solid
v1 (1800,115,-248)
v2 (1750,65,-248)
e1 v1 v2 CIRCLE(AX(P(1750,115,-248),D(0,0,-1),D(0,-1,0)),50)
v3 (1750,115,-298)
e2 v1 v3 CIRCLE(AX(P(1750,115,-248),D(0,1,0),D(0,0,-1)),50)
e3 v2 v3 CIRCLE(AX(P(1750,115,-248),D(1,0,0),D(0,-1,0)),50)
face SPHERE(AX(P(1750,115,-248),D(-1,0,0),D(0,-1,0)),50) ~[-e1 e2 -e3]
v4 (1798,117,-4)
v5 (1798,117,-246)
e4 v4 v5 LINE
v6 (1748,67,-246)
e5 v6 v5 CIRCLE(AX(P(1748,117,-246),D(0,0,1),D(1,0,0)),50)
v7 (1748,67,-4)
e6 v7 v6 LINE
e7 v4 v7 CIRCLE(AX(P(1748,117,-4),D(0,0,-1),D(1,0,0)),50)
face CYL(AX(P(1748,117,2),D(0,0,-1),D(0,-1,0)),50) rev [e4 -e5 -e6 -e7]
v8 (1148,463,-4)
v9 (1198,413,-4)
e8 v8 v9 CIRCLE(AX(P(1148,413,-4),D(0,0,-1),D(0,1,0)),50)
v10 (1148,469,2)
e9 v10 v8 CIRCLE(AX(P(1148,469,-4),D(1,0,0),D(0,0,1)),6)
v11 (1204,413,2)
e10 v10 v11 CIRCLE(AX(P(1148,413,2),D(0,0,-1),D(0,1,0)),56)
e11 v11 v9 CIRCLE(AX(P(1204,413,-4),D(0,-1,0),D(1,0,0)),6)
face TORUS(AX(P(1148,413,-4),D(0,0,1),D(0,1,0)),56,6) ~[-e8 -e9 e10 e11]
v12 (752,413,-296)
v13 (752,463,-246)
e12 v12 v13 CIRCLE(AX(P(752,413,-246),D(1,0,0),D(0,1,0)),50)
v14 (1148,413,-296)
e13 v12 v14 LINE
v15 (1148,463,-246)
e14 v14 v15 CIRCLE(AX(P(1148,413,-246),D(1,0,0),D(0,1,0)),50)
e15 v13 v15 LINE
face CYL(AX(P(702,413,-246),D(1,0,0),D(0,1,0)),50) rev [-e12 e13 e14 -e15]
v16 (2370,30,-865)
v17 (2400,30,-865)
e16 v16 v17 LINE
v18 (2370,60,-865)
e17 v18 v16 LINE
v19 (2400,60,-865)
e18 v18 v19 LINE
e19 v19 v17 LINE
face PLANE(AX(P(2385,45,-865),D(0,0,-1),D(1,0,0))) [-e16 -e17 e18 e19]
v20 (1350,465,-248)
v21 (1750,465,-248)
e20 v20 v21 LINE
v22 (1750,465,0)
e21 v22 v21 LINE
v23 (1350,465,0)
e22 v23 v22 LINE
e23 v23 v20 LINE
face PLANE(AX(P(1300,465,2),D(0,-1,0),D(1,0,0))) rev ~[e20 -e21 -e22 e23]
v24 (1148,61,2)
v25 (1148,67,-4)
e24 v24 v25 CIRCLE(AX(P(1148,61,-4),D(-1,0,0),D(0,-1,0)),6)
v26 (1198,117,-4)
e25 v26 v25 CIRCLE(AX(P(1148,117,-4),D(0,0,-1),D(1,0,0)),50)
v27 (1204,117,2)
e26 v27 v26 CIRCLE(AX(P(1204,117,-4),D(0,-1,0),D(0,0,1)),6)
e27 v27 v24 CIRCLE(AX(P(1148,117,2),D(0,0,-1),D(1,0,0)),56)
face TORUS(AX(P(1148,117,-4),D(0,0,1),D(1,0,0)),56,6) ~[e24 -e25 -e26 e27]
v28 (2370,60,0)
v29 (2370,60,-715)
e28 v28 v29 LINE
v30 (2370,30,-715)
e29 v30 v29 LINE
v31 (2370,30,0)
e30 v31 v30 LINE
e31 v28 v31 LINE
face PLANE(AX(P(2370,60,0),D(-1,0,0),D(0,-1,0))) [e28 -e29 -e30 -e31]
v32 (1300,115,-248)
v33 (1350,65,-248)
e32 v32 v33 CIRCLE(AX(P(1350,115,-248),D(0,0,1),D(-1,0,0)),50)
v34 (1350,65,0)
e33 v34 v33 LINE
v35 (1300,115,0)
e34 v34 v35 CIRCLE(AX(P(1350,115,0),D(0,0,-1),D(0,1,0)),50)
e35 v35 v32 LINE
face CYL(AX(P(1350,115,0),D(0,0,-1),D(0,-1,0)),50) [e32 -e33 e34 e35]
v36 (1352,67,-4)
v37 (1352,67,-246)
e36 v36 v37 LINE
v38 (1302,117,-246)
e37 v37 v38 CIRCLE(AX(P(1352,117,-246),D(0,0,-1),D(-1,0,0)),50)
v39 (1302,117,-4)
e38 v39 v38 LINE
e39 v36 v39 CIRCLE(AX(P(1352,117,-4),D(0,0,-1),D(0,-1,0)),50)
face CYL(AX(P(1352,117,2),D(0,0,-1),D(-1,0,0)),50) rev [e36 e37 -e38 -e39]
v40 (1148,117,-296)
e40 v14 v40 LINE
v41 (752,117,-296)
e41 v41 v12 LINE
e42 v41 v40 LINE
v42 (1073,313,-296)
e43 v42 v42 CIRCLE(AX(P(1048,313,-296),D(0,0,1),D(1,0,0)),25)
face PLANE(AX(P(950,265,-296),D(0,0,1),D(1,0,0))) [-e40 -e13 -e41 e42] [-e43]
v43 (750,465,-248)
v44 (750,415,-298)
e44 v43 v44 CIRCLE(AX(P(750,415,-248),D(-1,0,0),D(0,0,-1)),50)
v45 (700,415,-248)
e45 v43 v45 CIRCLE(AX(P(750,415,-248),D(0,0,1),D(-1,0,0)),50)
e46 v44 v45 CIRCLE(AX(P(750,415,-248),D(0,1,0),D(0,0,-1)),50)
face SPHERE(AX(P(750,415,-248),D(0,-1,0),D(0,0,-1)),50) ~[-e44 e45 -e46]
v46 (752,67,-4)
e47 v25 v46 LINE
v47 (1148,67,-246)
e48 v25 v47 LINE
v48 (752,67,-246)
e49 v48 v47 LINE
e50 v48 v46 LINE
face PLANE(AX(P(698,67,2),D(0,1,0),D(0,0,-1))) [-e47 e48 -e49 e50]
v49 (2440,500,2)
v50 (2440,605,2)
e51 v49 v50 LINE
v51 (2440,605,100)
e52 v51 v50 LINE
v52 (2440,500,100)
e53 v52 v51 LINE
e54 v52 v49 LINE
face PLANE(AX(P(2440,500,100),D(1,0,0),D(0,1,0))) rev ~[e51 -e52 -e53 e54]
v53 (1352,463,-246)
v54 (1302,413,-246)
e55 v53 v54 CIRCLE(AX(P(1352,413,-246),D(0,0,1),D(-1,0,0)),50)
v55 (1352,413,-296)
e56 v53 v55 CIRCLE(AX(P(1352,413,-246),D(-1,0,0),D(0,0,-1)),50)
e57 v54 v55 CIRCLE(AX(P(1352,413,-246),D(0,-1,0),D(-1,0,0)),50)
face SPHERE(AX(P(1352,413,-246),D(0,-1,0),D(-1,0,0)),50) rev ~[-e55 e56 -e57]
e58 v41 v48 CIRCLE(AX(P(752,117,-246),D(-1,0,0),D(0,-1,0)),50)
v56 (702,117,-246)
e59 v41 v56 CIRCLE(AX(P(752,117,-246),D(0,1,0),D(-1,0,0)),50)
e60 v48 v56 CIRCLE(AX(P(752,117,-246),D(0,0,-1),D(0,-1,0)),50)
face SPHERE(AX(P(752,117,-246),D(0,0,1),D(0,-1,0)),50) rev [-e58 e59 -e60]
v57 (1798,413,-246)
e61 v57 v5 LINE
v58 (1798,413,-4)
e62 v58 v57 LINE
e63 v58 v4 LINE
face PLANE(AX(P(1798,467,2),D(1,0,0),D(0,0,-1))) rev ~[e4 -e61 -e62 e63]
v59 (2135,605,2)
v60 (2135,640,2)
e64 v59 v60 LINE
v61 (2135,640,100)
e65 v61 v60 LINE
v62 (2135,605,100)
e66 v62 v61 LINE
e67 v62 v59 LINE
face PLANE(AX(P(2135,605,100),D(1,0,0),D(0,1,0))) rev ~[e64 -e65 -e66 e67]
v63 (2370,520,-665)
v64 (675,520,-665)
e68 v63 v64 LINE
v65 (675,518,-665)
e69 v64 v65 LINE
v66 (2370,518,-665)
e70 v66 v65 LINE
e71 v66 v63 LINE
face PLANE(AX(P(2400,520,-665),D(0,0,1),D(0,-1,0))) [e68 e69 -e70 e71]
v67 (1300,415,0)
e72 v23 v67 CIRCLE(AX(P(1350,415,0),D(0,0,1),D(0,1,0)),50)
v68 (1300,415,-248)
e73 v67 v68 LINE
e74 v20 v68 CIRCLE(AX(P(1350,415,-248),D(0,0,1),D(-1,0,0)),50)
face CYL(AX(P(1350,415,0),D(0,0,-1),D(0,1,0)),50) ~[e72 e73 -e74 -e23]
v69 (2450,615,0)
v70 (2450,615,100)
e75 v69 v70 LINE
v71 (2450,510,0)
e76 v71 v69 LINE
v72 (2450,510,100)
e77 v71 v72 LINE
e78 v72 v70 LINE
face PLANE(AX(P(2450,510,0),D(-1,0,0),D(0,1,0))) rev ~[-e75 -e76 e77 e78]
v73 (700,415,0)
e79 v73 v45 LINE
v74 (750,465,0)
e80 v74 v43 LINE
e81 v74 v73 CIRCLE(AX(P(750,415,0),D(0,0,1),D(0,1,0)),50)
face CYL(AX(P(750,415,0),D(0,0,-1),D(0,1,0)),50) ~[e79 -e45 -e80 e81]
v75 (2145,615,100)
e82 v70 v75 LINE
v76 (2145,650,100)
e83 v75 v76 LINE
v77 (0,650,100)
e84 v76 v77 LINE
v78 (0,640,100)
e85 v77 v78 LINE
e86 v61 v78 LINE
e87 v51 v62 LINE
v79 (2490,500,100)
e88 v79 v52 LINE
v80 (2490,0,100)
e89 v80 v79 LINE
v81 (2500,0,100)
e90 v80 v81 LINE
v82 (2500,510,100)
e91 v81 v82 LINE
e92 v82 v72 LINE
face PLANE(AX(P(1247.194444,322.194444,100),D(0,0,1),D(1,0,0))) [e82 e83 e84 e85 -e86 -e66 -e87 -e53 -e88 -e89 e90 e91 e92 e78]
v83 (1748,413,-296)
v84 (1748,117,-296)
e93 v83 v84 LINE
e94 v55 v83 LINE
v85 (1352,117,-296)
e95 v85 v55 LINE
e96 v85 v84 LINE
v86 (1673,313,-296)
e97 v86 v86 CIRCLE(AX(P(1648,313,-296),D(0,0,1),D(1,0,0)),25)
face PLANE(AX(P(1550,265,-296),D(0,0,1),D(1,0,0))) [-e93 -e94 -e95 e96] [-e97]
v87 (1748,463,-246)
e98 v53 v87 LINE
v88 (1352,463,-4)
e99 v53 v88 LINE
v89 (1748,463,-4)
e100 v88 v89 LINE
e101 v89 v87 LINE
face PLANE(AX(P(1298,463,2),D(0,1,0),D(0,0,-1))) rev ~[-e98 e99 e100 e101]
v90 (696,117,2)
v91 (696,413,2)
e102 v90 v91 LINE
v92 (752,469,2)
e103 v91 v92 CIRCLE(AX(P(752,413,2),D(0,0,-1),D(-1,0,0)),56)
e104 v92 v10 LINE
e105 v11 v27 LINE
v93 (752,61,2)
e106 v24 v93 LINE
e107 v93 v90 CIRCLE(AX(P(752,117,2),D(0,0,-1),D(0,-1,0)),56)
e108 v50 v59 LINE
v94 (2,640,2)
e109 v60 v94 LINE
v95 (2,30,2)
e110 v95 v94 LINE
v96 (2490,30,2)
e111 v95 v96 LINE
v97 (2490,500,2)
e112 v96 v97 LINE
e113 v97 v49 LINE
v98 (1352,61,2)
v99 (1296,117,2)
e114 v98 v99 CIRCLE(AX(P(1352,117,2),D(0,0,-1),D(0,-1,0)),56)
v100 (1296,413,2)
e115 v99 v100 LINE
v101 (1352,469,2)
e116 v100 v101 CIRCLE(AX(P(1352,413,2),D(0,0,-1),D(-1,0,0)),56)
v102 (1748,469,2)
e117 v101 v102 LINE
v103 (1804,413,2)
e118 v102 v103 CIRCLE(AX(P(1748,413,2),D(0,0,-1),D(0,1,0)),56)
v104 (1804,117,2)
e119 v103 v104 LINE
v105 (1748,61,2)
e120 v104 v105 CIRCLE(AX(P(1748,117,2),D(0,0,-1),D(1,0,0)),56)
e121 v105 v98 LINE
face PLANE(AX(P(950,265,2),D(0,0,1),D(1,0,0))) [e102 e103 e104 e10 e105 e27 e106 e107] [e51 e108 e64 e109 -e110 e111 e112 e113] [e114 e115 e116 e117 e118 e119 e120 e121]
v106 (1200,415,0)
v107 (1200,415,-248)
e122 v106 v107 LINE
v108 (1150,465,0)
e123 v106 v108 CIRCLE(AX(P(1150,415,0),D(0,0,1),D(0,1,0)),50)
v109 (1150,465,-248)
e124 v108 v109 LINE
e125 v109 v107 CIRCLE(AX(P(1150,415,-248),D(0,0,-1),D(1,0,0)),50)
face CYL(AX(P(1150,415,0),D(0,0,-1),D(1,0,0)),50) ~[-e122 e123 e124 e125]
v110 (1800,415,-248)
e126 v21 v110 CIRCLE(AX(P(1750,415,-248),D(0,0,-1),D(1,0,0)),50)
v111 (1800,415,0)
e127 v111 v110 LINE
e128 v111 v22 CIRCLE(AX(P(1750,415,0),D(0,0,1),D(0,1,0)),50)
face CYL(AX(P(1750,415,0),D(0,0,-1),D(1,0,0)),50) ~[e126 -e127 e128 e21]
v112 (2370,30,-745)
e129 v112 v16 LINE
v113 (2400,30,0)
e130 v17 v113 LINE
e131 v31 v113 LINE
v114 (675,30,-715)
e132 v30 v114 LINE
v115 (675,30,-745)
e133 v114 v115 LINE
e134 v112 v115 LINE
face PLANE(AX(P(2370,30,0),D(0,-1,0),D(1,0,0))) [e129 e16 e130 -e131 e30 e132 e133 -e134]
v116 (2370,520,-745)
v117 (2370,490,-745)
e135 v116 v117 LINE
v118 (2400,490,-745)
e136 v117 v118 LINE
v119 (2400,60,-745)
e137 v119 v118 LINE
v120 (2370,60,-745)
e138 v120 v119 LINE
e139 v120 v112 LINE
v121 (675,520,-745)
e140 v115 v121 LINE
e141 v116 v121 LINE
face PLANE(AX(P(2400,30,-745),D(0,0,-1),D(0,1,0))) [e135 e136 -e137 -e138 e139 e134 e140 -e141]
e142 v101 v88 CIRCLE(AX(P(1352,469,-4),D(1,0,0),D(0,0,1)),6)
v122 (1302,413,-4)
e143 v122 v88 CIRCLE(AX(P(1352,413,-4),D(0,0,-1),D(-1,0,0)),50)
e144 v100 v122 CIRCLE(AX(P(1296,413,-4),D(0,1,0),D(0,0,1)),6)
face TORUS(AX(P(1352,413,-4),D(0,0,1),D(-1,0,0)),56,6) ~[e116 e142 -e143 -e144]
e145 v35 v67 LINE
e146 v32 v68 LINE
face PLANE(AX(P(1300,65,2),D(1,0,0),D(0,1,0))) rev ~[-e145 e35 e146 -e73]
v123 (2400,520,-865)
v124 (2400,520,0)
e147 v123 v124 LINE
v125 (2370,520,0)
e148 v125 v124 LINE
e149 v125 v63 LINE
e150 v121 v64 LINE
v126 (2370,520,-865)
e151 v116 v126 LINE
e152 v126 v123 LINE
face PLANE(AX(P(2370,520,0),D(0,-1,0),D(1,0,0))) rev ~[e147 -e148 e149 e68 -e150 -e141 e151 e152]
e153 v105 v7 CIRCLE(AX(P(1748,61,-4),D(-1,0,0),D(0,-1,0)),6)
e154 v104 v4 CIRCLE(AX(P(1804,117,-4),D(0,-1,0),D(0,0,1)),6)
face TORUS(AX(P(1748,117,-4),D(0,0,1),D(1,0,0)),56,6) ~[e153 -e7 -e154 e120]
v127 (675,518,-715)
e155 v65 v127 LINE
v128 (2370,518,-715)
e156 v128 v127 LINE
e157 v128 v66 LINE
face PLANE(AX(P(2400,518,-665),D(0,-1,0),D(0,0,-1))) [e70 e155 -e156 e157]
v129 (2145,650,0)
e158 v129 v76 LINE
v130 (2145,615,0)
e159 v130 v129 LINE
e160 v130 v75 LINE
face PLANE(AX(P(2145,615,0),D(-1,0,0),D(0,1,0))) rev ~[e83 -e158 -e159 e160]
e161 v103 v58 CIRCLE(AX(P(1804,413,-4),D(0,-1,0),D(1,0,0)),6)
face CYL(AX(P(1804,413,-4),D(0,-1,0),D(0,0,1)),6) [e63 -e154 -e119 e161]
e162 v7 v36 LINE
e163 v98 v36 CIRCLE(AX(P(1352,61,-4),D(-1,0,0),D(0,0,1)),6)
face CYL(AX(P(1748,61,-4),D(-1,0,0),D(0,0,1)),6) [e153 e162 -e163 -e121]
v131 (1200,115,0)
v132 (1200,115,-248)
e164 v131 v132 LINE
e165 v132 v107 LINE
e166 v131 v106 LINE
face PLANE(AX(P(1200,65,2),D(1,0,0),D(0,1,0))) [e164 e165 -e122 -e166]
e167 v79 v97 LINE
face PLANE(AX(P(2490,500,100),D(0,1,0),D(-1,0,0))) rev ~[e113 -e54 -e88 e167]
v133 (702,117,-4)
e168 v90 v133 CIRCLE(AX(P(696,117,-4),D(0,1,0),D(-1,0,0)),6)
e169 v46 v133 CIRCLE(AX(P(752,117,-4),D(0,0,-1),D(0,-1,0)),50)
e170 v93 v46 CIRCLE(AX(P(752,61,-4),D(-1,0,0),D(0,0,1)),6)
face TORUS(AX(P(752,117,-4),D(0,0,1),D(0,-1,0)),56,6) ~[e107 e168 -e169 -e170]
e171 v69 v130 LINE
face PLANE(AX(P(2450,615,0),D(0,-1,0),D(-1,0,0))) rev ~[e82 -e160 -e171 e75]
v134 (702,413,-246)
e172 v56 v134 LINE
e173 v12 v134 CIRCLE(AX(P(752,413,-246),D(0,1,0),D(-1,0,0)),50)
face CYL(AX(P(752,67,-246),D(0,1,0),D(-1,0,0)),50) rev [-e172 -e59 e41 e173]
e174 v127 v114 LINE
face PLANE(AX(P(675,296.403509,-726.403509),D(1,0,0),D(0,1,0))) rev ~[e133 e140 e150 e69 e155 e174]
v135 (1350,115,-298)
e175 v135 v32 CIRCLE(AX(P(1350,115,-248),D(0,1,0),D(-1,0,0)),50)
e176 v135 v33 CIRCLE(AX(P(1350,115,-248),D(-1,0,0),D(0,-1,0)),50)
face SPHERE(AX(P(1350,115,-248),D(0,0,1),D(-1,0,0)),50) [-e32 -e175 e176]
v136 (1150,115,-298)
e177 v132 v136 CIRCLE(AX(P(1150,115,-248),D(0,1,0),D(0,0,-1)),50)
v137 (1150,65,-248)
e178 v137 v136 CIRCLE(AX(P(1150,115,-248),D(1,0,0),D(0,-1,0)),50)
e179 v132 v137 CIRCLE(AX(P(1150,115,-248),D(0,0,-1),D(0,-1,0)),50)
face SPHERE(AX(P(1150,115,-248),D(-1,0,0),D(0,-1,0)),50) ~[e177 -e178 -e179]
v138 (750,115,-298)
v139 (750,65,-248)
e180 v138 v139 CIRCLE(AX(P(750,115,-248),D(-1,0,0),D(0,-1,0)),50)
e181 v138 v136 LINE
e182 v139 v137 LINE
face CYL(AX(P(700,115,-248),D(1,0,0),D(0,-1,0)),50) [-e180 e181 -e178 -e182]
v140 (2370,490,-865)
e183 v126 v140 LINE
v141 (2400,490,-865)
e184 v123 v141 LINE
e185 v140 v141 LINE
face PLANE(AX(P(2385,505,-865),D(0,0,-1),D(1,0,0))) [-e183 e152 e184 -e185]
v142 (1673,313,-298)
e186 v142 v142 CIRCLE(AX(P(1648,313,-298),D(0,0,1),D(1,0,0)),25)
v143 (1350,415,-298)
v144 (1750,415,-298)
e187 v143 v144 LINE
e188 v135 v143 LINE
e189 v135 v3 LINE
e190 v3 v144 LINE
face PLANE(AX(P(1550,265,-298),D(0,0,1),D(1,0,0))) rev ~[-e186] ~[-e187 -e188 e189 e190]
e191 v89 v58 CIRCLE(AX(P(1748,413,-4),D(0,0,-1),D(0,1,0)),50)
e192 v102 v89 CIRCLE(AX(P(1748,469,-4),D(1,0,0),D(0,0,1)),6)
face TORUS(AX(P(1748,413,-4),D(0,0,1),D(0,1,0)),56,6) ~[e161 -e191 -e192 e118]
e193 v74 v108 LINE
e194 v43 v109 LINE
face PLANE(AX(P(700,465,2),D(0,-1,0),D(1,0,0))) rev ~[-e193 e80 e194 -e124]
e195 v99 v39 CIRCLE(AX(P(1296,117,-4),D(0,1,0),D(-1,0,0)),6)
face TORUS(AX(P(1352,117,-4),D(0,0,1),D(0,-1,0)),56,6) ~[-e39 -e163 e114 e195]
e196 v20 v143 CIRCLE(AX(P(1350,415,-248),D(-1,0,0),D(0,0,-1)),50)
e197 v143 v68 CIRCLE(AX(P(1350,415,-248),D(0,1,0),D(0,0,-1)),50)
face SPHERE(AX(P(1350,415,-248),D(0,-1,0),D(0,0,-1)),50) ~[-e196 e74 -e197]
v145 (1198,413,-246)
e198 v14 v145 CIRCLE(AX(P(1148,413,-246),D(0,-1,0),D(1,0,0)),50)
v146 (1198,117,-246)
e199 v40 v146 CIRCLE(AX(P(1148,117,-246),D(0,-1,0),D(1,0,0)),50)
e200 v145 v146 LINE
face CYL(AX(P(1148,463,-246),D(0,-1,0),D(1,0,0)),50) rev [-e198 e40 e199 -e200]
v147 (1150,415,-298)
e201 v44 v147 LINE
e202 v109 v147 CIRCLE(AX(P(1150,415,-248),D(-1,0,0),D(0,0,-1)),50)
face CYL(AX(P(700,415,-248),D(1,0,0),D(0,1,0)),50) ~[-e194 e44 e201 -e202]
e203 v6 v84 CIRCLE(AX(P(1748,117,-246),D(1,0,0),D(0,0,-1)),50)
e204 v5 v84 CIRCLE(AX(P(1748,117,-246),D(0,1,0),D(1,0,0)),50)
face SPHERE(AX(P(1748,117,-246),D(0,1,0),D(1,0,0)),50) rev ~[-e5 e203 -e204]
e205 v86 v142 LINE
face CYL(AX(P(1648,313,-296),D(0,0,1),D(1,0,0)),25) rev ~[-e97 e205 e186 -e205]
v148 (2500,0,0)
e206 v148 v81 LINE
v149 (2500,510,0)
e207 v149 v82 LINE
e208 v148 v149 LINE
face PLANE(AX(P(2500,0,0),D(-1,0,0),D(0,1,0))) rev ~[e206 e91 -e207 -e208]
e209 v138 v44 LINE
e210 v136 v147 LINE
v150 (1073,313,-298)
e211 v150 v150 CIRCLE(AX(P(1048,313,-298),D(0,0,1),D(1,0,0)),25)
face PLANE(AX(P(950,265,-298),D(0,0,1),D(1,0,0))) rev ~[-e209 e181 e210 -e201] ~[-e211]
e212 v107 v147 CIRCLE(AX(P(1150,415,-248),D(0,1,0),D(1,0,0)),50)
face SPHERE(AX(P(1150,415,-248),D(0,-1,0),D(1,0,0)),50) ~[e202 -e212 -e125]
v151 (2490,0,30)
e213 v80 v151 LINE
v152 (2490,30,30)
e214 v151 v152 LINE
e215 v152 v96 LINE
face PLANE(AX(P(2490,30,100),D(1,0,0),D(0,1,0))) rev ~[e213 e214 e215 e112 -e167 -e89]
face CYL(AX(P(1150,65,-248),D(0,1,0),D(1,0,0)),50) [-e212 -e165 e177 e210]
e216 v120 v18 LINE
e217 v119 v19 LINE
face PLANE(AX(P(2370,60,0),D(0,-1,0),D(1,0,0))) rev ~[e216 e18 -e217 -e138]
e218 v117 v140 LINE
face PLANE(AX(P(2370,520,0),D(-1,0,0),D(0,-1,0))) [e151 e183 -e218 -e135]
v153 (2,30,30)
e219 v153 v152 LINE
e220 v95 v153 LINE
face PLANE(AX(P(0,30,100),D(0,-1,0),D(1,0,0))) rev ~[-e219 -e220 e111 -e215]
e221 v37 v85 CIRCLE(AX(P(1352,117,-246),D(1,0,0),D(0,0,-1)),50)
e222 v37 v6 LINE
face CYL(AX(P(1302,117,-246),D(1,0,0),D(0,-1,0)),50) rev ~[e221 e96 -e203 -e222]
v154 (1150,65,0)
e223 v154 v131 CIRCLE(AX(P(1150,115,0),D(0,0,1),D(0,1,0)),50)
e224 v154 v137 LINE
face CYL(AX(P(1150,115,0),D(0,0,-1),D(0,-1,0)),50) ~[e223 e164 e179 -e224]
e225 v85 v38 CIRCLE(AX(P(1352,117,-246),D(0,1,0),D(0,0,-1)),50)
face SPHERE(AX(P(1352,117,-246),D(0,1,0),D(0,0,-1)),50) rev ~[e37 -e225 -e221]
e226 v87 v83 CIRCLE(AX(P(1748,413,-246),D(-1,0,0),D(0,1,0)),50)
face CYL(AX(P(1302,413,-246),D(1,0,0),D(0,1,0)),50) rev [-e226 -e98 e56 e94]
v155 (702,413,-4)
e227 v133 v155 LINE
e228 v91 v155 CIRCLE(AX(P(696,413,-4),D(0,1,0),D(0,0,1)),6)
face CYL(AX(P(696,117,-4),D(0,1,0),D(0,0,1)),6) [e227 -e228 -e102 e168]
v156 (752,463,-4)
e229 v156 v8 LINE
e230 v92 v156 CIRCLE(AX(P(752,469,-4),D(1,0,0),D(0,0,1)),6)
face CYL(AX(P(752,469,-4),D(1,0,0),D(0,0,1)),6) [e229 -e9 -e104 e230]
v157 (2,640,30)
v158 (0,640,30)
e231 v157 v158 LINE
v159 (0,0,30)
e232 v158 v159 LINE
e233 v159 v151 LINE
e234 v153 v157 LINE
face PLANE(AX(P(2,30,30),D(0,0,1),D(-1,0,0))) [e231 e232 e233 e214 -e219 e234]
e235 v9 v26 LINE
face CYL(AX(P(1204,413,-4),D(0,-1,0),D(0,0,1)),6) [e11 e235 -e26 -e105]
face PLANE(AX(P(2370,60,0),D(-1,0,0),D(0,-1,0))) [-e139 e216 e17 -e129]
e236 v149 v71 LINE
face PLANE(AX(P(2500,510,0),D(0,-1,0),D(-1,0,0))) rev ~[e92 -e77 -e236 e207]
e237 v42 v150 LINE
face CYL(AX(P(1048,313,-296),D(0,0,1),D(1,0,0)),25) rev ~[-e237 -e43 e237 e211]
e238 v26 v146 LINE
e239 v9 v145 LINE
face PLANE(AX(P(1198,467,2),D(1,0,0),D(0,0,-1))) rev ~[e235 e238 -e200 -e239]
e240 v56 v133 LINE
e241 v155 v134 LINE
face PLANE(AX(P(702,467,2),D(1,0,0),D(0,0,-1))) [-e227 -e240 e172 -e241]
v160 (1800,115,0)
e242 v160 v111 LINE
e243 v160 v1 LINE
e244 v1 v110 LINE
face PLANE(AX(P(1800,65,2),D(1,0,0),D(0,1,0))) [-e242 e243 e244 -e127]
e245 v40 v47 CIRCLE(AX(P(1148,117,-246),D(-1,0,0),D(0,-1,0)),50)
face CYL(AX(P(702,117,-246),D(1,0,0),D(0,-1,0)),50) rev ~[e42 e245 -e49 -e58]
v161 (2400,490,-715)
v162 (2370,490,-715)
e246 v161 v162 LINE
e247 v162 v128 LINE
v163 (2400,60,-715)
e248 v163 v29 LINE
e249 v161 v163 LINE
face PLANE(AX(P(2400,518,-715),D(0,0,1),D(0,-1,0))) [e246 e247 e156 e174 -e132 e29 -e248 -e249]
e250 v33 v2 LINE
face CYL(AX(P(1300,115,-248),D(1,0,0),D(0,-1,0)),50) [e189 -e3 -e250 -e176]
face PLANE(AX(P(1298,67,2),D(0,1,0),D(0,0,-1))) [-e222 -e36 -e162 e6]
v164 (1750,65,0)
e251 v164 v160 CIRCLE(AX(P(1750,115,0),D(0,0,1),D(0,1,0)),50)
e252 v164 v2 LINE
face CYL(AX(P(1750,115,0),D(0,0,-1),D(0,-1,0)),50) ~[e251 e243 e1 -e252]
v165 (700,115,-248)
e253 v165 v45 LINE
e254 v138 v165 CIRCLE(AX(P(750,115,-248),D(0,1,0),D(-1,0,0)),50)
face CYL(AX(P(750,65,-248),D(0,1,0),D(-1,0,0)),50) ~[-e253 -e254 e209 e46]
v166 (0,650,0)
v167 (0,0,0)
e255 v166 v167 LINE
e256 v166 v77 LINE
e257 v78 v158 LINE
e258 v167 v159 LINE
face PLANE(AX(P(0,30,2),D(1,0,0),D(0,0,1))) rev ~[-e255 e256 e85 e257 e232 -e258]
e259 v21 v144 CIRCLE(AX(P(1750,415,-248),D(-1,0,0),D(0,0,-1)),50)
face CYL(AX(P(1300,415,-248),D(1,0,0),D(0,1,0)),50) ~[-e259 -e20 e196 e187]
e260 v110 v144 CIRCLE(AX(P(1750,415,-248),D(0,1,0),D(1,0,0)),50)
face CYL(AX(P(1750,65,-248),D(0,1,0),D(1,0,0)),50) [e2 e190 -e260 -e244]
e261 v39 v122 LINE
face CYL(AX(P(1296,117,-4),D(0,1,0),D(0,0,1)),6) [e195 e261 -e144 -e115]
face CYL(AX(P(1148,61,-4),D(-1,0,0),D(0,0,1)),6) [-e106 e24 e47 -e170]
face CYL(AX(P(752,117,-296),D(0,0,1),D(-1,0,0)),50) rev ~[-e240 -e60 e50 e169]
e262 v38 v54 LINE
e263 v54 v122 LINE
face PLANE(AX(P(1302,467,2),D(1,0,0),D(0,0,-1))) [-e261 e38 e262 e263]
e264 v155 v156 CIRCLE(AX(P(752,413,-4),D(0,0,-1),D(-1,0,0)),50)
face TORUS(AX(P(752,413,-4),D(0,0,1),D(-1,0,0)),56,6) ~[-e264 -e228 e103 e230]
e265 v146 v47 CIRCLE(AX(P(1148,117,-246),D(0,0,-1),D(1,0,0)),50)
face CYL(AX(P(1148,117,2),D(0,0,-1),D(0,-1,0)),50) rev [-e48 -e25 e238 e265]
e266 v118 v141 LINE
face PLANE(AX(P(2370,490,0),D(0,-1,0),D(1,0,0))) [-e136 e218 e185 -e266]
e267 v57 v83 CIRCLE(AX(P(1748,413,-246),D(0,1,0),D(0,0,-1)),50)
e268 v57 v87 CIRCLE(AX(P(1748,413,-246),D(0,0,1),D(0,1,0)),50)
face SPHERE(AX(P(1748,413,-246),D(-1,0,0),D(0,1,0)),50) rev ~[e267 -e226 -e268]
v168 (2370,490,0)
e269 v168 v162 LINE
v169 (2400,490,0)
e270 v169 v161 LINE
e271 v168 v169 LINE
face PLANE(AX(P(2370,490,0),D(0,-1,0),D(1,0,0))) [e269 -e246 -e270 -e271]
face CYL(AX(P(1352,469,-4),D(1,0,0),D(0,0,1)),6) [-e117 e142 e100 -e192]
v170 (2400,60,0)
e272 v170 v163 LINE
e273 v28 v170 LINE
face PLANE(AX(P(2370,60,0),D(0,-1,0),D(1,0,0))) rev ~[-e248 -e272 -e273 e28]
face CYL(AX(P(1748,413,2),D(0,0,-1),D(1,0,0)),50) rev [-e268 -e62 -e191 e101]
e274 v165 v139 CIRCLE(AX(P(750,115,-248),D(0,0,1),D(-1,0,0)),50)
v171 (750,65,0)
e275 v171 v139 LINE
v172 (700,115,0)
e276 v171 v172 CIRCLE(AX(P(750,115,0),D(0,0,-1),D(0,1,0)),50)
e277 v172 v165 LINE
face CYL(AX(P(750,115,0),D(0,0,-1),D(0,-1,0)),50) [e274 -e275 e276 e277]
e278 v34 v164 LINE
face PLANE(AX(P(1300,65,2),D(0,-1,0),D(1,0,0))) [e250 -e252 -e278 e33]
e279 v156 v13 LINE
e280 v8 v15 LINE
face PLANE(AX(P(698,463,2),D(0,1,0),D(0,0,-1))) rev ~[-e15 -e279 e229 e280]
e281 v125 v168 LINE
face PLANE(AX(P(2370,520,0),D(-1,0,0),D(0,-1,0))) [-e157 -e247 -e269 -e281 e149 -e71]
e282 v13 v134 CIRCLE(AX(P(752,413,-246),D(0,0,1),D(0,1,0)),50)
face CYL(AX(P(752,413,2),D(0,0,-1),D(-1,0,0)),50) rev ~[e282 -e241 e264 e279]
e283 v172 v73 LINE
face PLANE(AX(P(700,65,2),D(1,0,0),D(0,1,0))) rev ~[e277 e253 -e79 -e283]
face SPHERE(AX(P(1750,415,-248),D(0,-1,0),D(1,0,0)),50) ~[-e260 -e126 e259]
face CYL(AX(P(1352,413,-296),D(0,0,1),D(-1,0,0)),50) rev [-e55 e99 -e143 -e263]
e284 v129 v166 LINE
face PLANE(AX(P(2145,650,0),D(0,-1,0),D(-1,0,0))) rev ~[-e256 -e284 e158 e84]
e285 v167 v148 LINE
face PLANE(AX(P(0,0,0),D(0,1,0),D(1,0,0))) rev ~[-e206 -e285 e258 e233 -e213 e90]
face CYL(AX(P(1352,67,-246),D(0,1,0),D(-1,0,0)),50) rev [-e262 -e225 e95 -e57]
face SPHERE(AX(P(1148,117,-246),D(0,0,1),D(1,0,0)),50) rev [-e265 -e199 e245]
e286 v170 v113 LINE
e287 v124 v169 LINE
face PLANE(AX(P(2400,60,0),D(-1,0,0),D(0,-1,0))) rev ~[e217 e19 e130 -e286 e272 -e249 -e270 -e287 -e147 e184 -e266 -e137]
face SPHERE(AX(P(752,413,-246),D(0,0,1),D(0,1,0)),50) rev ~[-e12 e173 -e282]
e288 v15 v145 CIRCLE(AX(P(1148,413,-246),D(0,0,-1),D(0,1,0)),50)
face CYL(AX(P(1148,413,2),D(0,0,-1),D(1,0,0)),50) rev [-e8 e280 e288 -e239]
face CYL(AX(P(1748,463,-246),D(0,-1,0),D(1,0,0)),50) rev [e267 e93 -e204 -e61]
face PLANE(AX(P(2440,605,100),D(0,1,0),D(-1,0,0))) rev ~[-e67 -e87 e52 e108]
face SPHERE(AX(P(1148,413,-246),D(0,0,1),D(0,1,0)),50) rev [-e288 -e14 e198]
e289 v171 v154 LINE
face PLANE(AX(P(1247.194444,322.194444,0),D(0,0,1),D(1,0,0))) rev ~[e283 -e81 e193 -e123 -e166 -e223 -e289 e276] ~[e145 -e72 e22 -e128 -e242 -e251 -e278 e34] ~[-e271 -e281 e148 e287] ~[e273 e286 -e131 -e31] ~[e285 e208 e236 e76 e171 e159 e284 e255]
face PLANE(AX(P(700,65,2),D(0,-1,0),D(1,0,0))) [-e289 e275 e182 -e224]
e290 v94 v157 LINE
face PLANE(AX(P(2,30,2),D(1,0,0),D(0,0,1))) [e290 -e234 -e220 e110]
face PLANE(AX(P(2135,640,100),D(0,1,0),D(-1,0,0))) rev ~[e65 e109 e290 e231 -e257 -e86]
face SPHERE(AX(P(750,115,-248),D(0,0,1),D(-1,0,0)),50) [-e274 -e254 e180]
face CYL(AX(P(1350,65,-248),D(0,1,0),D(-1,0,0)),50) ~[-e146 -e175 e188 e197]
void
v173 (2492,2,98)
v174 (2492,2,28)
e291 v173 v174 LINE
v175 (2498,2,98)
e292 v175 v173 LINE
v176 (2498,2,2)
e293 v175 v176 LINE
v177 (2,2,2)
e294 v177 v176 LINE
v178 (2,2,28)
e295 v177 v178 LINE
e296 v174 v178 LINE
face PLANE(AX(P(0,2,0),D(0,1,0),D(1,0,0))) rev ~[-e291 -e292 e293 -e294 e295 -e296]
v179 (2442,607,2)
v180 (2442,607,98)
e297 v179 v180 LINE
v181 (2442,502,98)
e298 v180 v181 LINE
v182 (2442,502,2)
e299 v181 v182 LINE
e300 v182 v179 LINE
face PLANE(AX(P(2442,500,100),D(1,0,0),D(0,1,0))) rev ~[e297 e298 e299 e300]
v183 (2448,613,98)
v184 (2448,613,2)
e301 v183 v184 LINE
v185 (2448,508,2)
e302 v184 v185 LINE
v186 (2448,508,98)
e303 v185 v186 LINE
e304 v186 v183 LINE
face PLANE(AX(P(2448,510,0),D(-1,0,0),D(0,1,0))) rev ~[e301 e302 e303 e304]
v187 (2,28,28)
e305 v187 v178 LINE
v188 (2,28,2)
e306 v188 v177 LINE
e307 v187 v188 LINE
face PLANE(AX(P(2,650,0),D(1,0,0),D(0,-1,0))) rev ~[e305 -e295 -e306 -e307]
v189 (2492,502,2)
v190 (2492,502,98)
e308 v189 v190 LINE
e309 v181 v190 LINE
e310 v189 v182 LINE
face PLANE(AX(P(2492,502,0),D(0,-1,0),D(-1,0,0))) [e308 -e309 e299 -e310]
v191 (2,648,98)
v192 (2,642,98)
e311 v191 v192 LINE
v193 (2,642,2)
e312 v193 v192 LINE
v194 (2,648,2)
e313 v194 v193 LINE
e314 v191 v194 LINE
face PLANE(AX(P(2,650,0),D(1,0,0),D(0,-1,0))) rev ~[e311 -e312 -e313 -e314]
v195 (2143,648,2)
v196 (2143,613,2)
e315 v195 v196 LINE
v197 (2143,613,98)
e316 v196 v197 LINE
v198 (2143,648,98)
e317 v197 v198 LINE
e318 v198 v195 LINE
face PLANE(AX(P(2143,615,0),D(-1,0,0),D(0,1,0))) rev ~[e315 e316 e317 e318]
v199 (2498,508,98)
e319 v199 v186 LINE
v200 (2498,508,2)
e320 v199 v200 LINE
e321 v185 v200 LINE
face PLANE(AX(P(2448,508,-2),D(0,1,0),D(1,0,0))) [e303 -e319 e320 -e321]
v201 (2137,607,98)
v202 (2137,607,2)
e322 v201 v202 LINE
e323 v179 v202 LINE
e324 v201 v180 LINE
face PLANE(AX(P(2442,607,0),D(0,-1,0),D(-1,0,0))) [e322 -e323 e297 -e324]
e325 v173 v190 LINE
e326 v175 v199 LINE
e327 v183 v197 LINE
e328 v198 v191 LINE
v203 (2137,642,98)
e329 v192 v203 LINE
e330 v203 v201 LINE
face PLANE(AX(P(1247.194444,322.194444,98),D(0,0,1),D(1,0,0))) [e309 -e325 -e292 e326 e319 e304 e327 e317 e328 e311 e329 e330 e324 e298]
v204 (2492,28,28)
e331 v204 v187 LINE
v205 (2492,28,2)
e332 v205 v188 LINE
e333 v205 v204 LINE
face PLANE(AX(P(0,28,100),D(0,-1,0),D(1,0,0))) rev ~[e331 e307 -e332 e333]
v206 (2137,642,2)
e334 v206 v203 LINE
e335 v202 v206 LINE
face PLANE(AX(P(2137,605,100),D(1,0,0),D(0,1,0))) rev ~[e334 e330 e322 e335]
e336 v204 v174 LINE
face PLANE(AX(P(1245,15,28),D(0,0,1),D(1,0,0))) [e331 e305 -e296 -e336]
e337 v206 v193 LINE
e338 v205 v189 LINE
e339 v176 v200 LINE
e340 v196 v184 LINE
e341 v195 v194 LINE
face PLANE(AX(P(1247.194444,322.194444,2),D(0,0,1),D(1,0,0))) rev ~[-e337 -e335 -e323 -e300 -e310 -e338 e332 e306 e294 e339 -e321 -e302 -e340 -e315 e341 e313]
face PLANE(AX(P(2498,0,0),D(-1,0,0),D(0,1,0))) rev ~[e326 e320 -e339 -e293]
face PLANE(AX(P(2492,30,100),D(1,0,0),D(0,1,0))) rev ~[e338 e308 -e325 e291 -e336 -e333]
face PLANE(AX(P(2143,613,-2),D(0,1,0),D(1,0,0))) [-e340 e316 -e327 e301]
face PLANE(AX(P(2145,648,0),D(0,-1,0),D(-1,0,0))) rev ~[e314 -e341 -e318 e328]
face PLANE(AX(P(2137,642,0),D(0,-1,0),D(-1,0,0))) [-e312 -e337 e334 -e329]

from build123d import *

# Parameters (mm, degrees)
F1_DEPTH     = 100
F3_DEPTH     = 98
F4_W         = 500
F4_H         = 400
F5_DEPTH     = 300
F6_W         = 2490
F6_H         = 30
F7_DEPTH     = 70
F8_T         = 2
F8_T3_DEPTH  = 104
F8_T5_DEPTH  = 34
F8_T7_DEPTH  = 32
F8_T9_DEPTH  = 102
F8_T11_DEPTH = 504
F8_T13_DEPTH = 404
F8_T15_DEPTH = 504
F9_R         = 50
F10_R        = 25
F11_DEPTH    = 2
F12_W        = 30
F12_H        = 30
F13_DEPTH    = 865
F14_R        = 6
F15_W        = 2
F15_H        = 28
F16_DEPTH    = 610
F18_DEPTH    = 1725


# Not quite as in the source:
# - a shell that OpenCascade refuses in one call is made with other operations: the cavity is built on its own and cut out
# - a feature names something its author has since deleted; it is built from what else it names


with BuildPart() as f1:
    # F0 (on Top) → F1 (new body)
    with BuildSketch(Plane.XY):
        Polygon((0, 650), (0, 0), (2500, 0), (2500, 510), (2450, 510), (2450, 615), (2145, 615), (2145, 650), align=None)
    extrude(amount=F1_DEPTH)

    # F2 (on face) → F3 (cut)
    with BuildSketch(Plane.XY.offset(100)):
        Polygon((0, 640), (0, 30), (2490, 30), (2490, 500), (2440, 500), (2440, 605), (2135, 605), (2135, 640), align=None)
    extrude(amount=-F3_DEPTH, mode=Mode.SUBTRACT)

    # F4 (on face) → F5 (join)
    with BuildSketch(Plane.XY.offset(2)):
        with Locations((950, 265)):
            Rectangle(F4_W, F4_H)
        with Locations((1550, 265)):
            Rectangle(F4_W, F4_H)
    extrude(amount=-F5_DEPTH)

    # F6 (on face) → F7 (cut)
    with BuildSketch(Plane.XY.offset(100)):
        with Locations((1245, 15)):
            Rectangle(F6_W, F6_H)
    extrude(amount=-F7_DEPTH, mode=Mode.SUBTRACT)

    # F8: shell of thickness 2, made by hand


with BuildPart() as f8_core1:
    # F8_t2: copy of F1
    add(f1.part)

    # the walls: a layer under each face that stays
    f8_faces = [f8_core1.faces().sort_by_distance(p)[0] for p in [
        (0, 21.6666666667, 23.3333333333),
        (1072.5, 650, 50),
        (2145, 632.5, 50),
        (2297.5, 615, 50),
        (2450, 562.5, 50),
        (2475, 510, 50),
        (2500, 255, 50),
        (97.65625, 641.975308642, 100),
        (2490, 250, 51),
        (2465, 500, 51),
        (2440, 552.5, 51),
        (2287.5, 605, 51),
        (2135, 622.5, 51),
        (1067.5, 640, 51),
        (1245, 30, 16),
        (1245, 15, 30),
        (416.6666666667, 0, 16.6666666667),
        (1250, 325, 0),
        (1800, 265, -149),
        (1550, 265, -298),
        (1550, 65, -149),
        (1300, 265, -149),
        (1550, 465, -149),
        (1200, 265, -149),
        (950, 265, -298),
        (950, 65, -149),
        (700, 265, -149),
        (950, 465, -149),
    ]]
    thicken(f8_faces, amount=-F8_T, mode=Mode.SUBTRACT)

    # F8_s4 → F8_t3 (cut)
    with BuildSketch(Plane.XY.offset(-2)):
        Polygon((2145.02, 615.02), (2143, 615), (2143, 613), (2145, 613), align=None)
        Polygon((2450.02, 510.02), (2448, 510), (2448, 508), (2450, 508), align=None)
    extrude(amount=F8_T3_DEPTH, mode=Mode.SUBTRACT)

    # F8_s6 → F8_t5 (cut)
    with BuildSketch(Plane.XZ.offset(-32)):
        Polygon((2489.98, 30.02), (2492, 30), (2492, 28), (2490, 28), align=None)
    extrude(amount=F8_T5_DEPTH, mode=Mode.SUBTRACT)

    # F8_s8 → F8_t7 (cut)
    with BuildSketch(Plane.XY):
        Polygon((2489.98, 30.02), (2492, 30), (2492, 28), (2490, 28), align=None)
    extrude(amount=F8_T7_DEPTH, mode=Mode.SUBTRACT)

    # F8_s10 → F8_t9 (cut)
    with BuildSketch(Plane.XY):
        Polygon((2489.98, 499.98), (2492, 500), (2492, 502), (2490, 502), align=None)
        Polygon((2439.98, 604.98), (2442, 605), (2442, 607), (2440, 607), align=None)
        Polygon((2134.98, 639.98), (2137, 640), (2137, 642), (2135, 642), align=None)
    extrude(amount=F8_T9_DEPTH, mode=Mode.SUBTRACT)

    # F8_s12 → F8_t11 (cut)
    with BuildSketch(Plane.YZ.offset(698)):
        Polygon((465.02, -0.02), (465, 2), (463, 2), (463, 0), align=None)
        Polygon((64.98, -0.02), (65, 2), (67, 2), (67, 0), align=None)
    extrude(amount=F8_T11_DEPTH, mode=Mode.SUBTRACT)

    # F8_s14 → F8_t13 (cut)
    with BuildSketch(Plane.XZ.offset(-467)):
        Polygon((699.98, -0.02), (700, 2), (702, 2), (702, 0), align=None)
        Polygon((1200.02, -0.02), (1200, 2), (1198, 2), (1198, 0), align=None)
        Polygon((1299.98, -0.02), (1300, 2), (1302, 2), (1302, 0), align=None)
        Polygon((1800.02, -0.02), (1800, 2), (1798, 2), (1798, 0), align=None)
    extrude(amount=F8_T13_DEPTH, mode=Mode.SUBTRACT)

    # F8_s16 → F8_t15 (cut)
    with BuildSketch(Plane.YZ.offset(1298)):
        Polygon((465.02, -0.02), (465, 2), (463, 2), (463, 0), align=None)
        Polygon((64.98, -0.02), (65, 2), (67, 2), (67, 0), align=None)
    extrude(amount=F8_T15_DEPTH, mode=Mode.SUBTRACT)


with BuildPart() as f1_1:
    add(f1.part)

    # what is left inside the walls is the cavity
    f8_cavity = [f8_core1.part.solids().sort_by_distance(p)[0] for p in [
        (1072.5, 647.98, 66),
        (950, 199, -295.98),
        (1550, 199, -295.98),
    ]]
    add(f8_cavity, mode=Mode.SUBTRACT)

    # F9
    f9_edges = [f1_1.edges().sort_by_distance(p)[0] for p in [
        (702, 463, -147),
        (1198, 463, -147),
        (950, 463, -296),
        (702, 67, -147),
        (1198, 67, -147),
        (1198, 265, -296),
        (950, 67, -296),
        (702, 265, -296),
        (1302, 265, -296),
        (1302, 463, -147),
        (1550, 463, -296),
        (1798, 463, -147),
        (1798, 265, -296),
        (1798, 67, -147),
        (1550, 67, -296),
        (1302, 67, -147),
        (700, 65, -149),
        (700, 265, -298),
        (950, 65, -298),
        (1300, 65, -149),
        (1300, 265, -298),
        (1550, 65, -298),
        (1200, 65, -149),
        (1200, 265, -298),
        (1800, 65, -149),
        (1800, 265, -298),
        (1800, 465, -149),
        (1550, 465, -298),
        (1300, 465, -149),
        (1200, 465, -149),
        (950, 465, -298),
        (700, 465, -149),
    ]]
    fillet(f9_edges, radius=F9_R)

    # F10 (on face) → F11 (cut, through all)
    with BuildSketch(Plane.XY.offset(-296)):
        with Locations((1048, 313)):
            Circle(F10_R)
        with Locations((1648, 313)):
            Circle(F10_R)
    extrude(amount=-F11_DEPTH, mode=Mode.SUBTRACT)

    # F12 (on face) → F13 (join)
    with BuildSketch(Plane(origin=(0, 0, 0), x_dir=(1, 0, 0), z_dir=(0, 0, -1))):
        with Locations((2385, -505)):
            Rectangle(F12_W, F12_H)
        with Locations((2385, -45)):
            Rectangle(F12_W, F12_H)
    extrude(amount=F13_DEPTH)

    # F14
    f14_edges = [f1_1.edges().sort_by_distance(p)[0] for p in [
        (950, 463, 2),
        (716.644661, 448.355339, 2),
        (1183.355339, 448.355339, 2),
        (702, 265, 2),
        (1198, 265, 2),
        (716.644661, 81.644661, 2),
        (1183.355339, 81.644661, 2),
        (950, 67, 2),
        (1550, 463, 2),
        (1316.644661, 448.355339, 2),
        (1783.355339, 448.355339, 2),
        (1302, 265, 2),
        (1798, 265, 2),
        (1316.644661, 81.644661, 2),
        (1783.355339, 81.644661, 2),
        (1550, 67, 2),
    ]]
    fillet(f14_edges, radius=F14_R)

    # F15 (on face) → F16 (join, through all)
    with BuildSketch(Plane(origin=(0, 30, 0), x_dir=(-1, 0, 0), z_dir=(0, 1, 0))):
        with Locations((-1, 16)):
            Rectangle(F15_W, F15_H)
    extrude(amount=F16_DEPTH)

    # F17 (on face) → F18 (join)
    with BuildSketch(Plane.YZ.offset(2400)):
        Polygon((30, -745), (520, -745), (520, -665), (518, -665), (518, -715), (30, -715), align=None)
    extrude(amount=-F18_DEPTH)


solid = f1_1.part
